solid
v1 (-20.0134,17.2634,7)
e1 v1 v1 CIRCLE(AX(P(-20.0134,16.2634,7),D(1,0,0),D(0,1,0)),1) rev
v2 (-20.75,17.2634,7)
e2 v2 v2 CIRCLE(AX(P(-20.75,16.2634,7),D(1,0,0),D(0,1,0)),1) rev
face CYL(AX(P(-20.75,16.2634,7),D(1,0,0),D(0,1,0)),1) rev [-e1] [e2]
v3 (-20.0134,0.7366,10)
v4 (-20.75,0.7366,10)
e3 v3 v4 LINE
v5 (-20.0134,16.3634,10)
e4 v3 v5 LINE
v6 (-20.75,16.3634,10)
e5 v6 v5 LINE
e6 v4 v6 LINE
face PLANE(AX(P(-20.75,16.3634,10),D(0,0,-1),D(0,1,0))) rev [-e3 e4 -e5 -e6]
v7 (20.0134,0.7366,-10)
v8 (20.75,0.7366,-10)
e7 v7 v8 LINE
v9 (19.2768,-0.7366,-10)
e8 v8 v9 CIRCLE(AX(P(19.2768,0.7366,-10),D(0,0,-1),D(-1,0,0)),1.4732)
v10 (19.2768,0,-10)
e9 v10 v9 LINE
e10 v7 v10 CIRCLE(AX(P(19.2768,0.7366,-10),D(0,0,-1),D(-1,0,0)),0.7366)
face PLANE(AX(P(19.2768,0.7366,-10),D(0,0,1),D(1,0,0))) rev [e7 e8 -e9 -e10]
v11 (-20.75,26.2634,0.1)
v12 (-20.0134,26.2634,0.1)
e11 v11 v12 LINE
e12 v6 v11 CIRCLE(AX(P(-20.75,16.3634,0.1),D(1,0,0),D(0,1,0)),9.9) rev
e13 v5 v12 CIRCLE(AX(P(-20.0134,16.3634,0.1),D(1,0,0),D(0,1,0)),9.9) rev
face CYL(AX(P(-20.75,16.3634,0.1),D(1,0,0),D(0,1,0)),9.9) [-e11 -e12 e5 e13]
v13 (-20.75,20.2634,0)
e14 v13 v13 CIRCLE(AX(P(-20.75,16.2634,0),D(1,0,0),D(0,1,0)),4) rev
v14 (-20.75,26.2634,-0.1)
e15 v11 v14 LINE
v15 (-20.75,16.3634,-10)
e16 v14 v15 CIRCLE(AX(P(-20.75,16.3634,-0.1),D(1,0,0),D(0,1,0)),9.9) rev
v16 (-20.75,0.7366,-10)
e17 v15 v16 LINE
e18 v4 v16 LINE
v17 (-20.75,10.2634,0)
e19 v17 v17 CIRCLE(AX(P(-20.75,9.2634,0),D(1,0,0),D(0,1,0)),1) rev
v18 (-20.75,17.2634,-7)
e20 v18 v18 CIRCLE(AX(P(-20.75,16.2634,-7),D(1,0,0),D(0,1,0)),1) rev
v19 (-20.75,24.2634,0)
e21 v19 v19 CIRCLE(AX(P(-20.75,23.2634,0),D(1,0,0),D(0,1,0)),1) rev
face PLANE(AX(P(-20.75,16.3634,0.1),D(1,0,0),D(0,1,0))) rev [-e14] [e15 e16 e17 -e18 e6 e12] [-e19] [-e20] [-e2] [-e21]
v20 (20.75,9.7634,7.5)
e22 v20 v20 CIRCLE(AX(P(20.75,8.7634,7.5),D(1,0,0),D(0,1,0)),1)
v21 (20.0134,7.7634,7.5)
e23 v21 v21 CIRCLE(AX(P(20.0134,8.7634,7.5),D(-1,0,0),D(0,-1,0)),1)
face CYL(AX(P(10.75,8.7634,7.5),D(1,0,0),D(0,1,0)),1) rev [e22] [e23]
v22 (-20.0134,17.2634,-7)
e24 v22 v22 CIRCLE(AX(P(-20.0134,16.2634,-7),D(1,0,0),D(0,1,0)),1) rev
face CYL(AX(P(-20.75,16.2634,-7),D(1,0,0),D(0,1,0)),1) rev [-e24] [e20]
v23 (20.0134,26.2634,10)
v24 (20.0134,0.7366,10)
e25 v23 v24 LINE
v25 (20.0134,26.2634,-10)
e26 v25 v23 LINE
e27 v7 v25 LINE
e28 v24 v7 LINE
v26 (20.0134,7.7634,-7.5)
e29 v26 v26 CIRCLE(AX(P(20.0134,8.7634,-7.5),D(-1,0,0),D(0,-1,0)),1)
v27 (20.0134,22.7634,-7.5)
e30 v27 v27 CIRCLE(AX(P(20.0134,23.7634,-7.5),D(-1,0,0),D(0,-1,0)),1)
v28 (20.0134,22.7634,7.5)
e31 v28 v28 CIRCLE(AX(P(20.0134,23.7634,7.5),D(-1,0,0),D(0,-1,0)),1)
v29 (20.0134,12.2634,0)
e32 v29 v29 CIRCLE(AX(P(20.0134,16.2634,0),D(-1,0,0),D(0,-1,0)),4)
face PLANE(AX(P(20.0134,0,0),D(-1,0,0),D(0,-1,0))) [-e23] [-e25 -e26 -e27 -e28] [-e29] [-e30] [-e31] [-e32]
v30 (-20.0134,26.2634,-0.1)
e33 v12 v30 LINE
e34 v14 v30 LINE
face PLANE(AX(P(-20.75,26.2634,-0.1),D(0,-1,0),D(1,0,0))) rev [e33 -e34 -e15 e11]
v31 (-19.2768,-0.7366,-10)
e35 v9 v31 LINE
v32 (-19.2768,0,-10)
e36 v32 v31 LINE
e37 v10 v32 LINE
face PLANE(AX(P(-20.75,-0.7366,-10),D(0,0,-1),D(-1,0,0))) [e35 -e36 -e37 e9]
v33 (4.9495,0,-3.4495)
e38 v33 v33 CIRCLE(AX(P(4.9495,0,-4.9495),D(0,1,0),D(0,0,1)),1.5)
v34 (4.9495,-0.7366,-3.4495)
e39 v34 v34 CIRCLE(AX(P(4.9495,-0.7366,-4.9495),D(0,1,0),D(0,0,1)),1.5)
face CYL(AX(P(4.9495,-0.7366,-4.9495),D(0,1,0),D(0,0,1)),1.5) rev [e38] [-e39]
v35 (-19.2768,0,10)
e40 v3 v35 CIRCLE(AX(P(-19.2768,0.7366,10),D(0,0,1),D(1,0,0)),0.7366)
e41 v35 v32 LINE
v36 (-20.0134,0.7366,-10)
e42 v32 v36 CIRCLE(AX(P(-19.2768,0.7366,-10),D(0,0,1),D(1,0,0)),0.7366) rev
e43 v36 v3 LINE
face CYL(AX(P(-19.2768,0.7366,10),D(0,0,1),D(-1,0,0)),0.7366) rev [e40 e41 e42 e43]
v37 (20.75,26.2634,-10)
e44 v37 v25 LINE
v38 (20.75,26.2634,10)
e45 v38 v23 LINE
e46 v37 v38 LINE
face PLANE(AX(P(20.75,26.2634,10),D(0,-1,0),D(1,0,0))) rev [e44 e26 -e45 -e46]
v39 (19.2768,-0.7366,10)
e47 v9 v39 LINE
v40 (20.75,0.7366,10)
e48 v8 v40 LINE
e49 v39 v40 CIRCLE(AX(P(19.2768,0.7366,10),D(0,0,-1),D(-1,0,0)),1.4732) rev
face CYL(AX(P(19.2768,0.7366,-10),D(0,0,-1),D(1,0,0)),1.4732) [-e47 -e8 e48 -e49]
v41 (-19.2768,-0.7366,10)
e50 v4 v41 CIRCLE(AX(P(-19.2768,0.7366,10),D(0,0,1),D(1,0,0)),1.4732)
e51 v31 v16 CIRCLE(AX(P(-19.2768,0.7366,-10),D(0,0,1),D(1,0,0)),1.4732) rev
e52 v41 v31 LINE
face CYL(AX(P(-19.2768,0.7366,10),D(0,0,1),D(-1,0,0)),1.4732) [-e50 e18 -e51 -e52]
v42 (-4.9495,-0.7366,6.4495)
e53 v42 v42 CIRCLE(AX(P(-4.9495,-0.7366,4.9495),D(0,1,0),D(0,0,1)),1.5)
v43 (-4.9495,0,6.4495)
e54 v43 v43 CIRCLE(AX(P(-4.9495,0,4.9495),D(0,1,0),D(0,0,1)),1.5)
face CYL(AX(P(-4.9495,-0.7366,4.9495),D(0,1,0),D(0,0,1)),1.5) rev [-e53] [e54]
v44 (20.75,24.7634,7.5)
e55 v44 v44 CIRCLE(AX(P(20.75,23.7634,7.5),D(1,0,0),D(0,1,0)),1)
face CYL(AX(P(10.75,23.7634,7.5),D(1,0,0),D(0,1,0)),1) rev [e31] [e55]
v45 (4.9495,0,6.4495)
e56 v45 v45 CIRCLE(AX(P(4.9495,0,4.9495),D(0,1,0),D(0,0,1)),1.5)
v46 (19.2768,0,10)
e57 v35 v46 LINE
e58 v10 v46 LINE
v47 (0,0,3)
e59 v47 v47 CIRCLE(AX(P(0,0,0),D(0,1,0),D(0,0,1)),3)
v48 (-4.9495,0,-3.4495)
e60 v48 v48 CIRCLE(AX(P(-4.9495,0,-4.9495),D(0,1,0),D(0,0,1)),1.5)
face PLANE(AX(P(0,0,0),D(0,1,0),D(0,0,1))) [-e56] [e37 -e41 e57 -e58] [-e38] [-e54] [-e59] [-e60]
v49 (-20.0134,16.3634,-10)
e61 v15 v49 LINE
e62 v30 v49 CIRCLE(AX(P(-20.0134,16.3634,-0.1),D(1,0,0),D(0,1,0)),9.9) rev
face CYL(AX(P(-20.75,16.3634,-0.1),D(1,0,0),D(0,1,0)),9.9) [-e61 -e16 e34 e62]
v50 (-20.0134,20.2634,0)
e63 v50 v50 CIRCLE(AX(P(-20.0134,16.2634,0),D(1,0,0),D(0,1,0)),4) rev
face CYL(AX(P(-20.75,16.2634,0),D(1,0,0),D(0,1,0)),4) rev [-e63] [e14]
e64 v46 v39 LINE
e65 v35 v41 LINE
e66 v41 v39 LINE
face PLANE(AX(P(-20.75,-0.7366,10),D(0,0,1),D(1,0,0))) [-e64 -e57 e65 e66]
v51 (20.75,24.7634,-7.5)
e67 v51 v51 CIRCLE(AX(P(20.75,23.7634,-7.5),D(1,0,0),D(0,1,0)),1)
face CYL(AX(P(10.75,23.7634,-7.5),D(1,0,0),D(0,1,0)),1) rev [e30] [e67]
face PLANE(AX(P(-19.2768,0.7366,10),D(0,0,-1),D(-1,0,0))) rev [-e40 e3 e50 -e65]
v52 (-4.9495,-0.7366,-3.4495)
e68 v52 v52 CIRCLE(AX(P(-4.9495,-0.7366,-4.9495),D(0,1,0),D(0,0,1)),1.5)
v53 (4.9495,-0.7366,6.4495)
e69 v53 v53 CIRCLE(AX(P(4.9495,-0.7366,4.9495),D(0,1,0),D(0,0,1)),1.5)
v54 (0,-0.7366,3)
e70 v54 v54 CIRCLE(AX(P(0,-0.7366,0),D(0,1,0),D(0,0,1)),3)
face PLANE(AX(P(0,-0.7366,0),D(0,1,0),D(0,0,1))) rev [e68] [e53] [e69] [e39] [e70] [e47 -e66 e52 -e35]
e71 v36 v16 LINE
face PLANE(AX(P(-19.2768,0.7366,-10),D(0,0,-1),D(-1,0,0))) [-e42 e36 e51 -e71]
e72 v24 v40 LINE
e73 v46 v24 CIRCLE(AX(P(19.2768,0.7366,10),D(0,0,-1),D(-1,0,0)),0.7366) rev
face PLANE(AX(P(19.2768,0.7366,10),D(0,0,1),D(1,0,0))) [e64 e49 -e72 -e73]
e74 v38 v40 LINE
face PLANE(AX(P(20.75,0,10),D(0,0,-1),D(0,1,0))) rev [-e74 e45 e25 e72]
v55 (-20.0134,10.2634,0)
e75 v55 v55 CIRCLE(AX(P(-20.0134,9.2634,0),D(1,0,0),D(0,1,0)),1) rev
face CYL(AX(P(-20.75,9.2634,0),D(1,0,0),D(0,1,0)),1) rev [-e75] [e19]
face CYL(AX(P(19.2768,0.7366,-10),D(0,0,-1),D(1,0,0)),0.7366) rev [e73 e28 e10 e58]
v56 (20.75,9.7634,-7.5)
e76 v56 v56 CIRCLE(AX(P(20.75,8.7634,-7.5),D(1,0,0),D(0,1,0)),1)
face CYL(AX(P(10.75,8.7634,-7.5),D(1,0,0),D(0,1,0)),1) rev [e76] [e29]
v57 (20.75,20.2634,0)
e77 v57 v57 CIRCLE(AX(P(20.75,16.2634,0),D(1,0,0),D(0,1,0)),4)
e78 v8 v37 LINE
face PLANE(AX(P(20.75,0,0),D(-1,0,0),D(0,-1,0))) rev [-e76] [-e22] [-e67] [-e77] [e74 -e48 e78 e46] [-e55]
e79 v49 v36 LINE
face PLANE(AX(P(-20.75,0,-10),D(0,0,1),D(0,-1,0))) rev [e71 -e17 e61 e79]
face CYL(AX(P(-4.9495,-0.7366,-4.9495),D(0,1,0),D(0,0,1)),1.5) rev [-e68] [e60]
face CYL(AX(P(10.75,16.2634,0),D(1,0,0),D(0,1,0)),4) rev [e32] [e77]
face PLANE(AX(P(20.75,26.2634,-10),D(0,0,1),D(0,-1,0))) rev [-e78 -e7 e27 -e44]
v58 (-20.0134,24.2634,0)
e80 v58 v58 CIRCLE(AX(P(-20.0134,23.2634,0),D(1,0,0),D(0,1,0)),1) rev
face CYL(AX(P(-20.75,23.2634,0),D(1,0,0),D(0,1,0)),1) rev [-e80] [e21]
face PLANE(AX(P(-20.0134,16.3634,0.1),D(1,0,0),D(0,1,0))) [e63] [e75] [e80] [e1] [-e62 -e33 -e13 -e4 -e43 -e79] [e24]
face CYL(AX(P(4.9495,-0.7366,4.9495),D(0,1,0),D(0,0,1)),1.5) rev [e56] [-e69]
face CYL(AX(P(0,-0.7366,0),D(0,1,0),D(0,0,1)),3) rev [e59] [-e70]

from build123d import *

# Parameters (mm, degrees)
SKETCH_1_W                       = 41.5
SKETCH_1_H                       = 20
SKETCH_1_R                       = 3
SKETCH_1_R_2                     = 1.5
SM_BASE_FLANGE_1_DEPTH           = 0.7366
SM_EDGE_FLANGE_1_STRIP_W         = 4.4196
SM_EDGE_FLANGE_1_STRIP_H         = 0.7366
SM_EDGE_FLANGE_1_STRIP_CUT_DEPTH = 20
SM_EDGE_FLANGE_1_DEPTH           = 20
SM_EDGE_FLANGE_1_PROFILE_R       = 1
SM_EDGE_FLANGE_1_PROFILE_R_2     = 4
SM_EDGE_FLANGE_1_FLAT_DEPTH      = 0.7366
SM_EDGE_FLANGE_2_STRIP_W         = 4.4196
SM_EDGE_FLANGE_2_STRIP_H         = 0.7366
SM_EDGE_FLANGE_2_STRIP_CUT_DEPTH = 20
SM_EDGE_FLANGE_2_DEPTH           = 20
CUT_EXTRUDE_START                = -10
SKETCH_14_R                      = 4
SKETCH_14_R_2                    = 1
CUT_EXTRUDE_1_DEPTH              = 10


# Sheet-metal steps are written as plain solids
with BuildPart() as part:
    # Sketch 1 → 基体-法兰1 (new body)
    with BuildSketch(Plane(origin=(0, 0, 0), x_dir=(1, 0, 0), z_dir=(0, 1, 0))):
        Rectangle(SKETCH_1_W, SKETCH_1_H)
        with Locations(Location((0, 0, 0), (0, 0, 270))):
            Circle(SKETCH_1_R, mode=Mode.SUBTRACT)
        with Locations(Location((4.9495, 4.9495, 0), (0, 0, 270))):
            Circle(SKETCH_1_R_2, mode=Mode.SUBTRACT)
        with Locations(Location((-4.9495, 4.9495, 0), (0, 0, 270))):
            Circle(SKETCH_1_R_2, mode=Mode.SUBTRACT)
        with Locations(Location((-4.9495, -4.9495, 0), (0, 0, 270))):
            Circle(SKETCH_1_R_2, mode=Mode.SUBTRACT)
        with Locations(Location((4.9495, -4.9495, 0), (0, 0, 270))):
            Circle(SKETCH_1_R_2, mode=Mode.SUBTRACT)
    extrude(amount=-SM_BASE_FLANGE_1_DEPTH)

    # 边线-法兰1 strip (across the edge) → 边线-法兰1 strip cut (cut)
    with BuildSketch(Plane(origin=(-20.75, 0, -10), x_dir=(1, 0, 0), z_dir=(0, 0, 1))):
        with Locations((-0.7366, -0.3683)):
            Rectangle(SM_EDGE_FLANGE_1_STRIP_W, SM_EDGE_FLANGE_1_STRIP_H)
    extrude(amount=SM_EDGE_FLANGE_1_STRIP_CUT_DEPTH, mode=Mode.SUBTRACT)

    # 边线-法兰1 bend section (across the edge) → 边线-法兰1 (add)
    with BuildSketch(Plane(origin=(-20.75, 0, -10), x_dir=(1, 0, 0), z_dir=(0, 0, 1))):
        with BuildLine():
            Line((0, 0.7366), (0.7366, 0.7366))
            ThreePointArc((0.7366, 0.7366), (0.952345145, 0.215745145), (1.4732, 0))
            Line((1.4732, 0), (1.4732, -0.7366))
            ThreePointArc((1.4732, -0.7366), (0.43149029, -0.30510971), (0, 0.7366))
        make_face()
    extrude(amount=SM_EDGE_FLANGE_1_DEPTH)

    # 边线-法兰1 profile (on flange) → 边线-法兰1 flat (add)
    with BuildSketch(Plane.ZY.offset(20.75)):
        with BuildLine():
            Line((-10, 0.7366), (10, 0.7366))
            Line((10, 0.7366), (10, 16.3634))
            ThreePointArc((10, 16.3634), (7.100357134, 23.363757134), (0.1, 26.2634))
            Line((0.1, 26.2634), (-0.1, 26.2634))
            ThreePointArc((-0.1, 26.2634), (-7.100357134, 23.363757134), (-10, 16.3634))
            Line((-10, 16.3634), (-10, 0.7366))
        make_face()
        with Locations((0, 9.2634)):
            Circle(SM_EDGE_FLANGE_1_PROFILE_R, mode=Mode.SUBTRACT)
        with Locations((7, 16.2634)):
            Circle(SM_EDGE_FLANGE_1_PROFILE_R, mode=Mode.SUBTRACT)
        with Locations((0, 16.2634)):
            Circle(SM_EDGE_FLANGE_1_PROFILE_R_2, mode=Mode.SUBTRACT)
        with Locations((-7, 16.2634)):
            Circle(SM_EDGE_FLANGE_1_PROFILE_R, mode=Mode.SUBTRACT)
        with Locations((0, 23.2634)):
            Circle(SM_EDGE_FLANGE_1_PROFILE_R, mode=Mode.SUBTRACT)
    extrude(amount=-SM_EDGE_FLANGE_1_FLAT_DEPTH)

    # 边线-法兰2 strip (across the edge) → 边线-法兰2 strip cut (cut)
    with BuildSketch(Plane(origin=(20.75, 0, 10), x_dir=(-1, 0, 0), z_dir=(0, 0, -1))):
        with Locations((-0.7366, -0.3683)):
            Rectangle(SM_EDGE_FLANGE_2_STRIP_W, SM_EDGE_FLANGE_2_STRIP_H)
    extrude(amount=SM_EDGE_FLANGE_2_STRIP_CUT_DEPTH, mode=Mode.SUBTRACT)

    # 边线-法兰2 section (across the edge) → 边线-法兰2 (add)
    with BuildSketch(Plane(origin=(20.75, 0, 10), x_dir=(-1, 0, 0), z_dir=(0, 0, -1))):
        with BuildLine():
            Line((0, 0.7366), (0, 26.2634))
            Line((0, 26.2634), (0.7366, 26.2634))
            Line((0.7366, 26.2634), (0.7366, 0.7366))
            ThreePointArc((0.7366, 0.7366), (0.952345145, 0.215745145), (1.4732, 0))
            Line((1.4732, 0), (1.4732, -0.7366))
            ThreePointArc((1.4732, -0.7366), (0.43149029, -0.30510971), (0, 0.7366))
        make_face()
    extrude(amount=SM_EDGE_FLANGE_2_DEPTH)

    # 草图14 → 切除-拉伸1 (cut)
    with BuildSketch(Plane(origin=(20.75, 0, 0), x_dir=(0, 0, -1), z_dir=(1, 0, 0)).offset(CUT_EXTRUDE_START)):
        with Locations(Location((0, 16.2634, 0), (0, 0, 90))):
            Circle(SKETCH_14_R)
        with Locations(Location((-7.5, 23.7634, 0), (0, 0, 90))):
            Circle(SKETCH_14_R_2)
        with Locations(Location((7.5, 23.7634, 0), (0, 0, 90))):
            Circle(SKETCH_14_R_2)
        with Locations(Location((7.5, 8.7634, 0), (0, 0, 90))):
            Circle(SKETCH_14_R_2)
        with Locations(Location((-7.5, 8.7634, 0), (0, 0, 90))):
            Circle(SKETCH_14_R_2)
    extrude(amount=CUT_EXTRUDE_1_DEPTH, mode=Mode.SUBTRACT)


solid = part.part
